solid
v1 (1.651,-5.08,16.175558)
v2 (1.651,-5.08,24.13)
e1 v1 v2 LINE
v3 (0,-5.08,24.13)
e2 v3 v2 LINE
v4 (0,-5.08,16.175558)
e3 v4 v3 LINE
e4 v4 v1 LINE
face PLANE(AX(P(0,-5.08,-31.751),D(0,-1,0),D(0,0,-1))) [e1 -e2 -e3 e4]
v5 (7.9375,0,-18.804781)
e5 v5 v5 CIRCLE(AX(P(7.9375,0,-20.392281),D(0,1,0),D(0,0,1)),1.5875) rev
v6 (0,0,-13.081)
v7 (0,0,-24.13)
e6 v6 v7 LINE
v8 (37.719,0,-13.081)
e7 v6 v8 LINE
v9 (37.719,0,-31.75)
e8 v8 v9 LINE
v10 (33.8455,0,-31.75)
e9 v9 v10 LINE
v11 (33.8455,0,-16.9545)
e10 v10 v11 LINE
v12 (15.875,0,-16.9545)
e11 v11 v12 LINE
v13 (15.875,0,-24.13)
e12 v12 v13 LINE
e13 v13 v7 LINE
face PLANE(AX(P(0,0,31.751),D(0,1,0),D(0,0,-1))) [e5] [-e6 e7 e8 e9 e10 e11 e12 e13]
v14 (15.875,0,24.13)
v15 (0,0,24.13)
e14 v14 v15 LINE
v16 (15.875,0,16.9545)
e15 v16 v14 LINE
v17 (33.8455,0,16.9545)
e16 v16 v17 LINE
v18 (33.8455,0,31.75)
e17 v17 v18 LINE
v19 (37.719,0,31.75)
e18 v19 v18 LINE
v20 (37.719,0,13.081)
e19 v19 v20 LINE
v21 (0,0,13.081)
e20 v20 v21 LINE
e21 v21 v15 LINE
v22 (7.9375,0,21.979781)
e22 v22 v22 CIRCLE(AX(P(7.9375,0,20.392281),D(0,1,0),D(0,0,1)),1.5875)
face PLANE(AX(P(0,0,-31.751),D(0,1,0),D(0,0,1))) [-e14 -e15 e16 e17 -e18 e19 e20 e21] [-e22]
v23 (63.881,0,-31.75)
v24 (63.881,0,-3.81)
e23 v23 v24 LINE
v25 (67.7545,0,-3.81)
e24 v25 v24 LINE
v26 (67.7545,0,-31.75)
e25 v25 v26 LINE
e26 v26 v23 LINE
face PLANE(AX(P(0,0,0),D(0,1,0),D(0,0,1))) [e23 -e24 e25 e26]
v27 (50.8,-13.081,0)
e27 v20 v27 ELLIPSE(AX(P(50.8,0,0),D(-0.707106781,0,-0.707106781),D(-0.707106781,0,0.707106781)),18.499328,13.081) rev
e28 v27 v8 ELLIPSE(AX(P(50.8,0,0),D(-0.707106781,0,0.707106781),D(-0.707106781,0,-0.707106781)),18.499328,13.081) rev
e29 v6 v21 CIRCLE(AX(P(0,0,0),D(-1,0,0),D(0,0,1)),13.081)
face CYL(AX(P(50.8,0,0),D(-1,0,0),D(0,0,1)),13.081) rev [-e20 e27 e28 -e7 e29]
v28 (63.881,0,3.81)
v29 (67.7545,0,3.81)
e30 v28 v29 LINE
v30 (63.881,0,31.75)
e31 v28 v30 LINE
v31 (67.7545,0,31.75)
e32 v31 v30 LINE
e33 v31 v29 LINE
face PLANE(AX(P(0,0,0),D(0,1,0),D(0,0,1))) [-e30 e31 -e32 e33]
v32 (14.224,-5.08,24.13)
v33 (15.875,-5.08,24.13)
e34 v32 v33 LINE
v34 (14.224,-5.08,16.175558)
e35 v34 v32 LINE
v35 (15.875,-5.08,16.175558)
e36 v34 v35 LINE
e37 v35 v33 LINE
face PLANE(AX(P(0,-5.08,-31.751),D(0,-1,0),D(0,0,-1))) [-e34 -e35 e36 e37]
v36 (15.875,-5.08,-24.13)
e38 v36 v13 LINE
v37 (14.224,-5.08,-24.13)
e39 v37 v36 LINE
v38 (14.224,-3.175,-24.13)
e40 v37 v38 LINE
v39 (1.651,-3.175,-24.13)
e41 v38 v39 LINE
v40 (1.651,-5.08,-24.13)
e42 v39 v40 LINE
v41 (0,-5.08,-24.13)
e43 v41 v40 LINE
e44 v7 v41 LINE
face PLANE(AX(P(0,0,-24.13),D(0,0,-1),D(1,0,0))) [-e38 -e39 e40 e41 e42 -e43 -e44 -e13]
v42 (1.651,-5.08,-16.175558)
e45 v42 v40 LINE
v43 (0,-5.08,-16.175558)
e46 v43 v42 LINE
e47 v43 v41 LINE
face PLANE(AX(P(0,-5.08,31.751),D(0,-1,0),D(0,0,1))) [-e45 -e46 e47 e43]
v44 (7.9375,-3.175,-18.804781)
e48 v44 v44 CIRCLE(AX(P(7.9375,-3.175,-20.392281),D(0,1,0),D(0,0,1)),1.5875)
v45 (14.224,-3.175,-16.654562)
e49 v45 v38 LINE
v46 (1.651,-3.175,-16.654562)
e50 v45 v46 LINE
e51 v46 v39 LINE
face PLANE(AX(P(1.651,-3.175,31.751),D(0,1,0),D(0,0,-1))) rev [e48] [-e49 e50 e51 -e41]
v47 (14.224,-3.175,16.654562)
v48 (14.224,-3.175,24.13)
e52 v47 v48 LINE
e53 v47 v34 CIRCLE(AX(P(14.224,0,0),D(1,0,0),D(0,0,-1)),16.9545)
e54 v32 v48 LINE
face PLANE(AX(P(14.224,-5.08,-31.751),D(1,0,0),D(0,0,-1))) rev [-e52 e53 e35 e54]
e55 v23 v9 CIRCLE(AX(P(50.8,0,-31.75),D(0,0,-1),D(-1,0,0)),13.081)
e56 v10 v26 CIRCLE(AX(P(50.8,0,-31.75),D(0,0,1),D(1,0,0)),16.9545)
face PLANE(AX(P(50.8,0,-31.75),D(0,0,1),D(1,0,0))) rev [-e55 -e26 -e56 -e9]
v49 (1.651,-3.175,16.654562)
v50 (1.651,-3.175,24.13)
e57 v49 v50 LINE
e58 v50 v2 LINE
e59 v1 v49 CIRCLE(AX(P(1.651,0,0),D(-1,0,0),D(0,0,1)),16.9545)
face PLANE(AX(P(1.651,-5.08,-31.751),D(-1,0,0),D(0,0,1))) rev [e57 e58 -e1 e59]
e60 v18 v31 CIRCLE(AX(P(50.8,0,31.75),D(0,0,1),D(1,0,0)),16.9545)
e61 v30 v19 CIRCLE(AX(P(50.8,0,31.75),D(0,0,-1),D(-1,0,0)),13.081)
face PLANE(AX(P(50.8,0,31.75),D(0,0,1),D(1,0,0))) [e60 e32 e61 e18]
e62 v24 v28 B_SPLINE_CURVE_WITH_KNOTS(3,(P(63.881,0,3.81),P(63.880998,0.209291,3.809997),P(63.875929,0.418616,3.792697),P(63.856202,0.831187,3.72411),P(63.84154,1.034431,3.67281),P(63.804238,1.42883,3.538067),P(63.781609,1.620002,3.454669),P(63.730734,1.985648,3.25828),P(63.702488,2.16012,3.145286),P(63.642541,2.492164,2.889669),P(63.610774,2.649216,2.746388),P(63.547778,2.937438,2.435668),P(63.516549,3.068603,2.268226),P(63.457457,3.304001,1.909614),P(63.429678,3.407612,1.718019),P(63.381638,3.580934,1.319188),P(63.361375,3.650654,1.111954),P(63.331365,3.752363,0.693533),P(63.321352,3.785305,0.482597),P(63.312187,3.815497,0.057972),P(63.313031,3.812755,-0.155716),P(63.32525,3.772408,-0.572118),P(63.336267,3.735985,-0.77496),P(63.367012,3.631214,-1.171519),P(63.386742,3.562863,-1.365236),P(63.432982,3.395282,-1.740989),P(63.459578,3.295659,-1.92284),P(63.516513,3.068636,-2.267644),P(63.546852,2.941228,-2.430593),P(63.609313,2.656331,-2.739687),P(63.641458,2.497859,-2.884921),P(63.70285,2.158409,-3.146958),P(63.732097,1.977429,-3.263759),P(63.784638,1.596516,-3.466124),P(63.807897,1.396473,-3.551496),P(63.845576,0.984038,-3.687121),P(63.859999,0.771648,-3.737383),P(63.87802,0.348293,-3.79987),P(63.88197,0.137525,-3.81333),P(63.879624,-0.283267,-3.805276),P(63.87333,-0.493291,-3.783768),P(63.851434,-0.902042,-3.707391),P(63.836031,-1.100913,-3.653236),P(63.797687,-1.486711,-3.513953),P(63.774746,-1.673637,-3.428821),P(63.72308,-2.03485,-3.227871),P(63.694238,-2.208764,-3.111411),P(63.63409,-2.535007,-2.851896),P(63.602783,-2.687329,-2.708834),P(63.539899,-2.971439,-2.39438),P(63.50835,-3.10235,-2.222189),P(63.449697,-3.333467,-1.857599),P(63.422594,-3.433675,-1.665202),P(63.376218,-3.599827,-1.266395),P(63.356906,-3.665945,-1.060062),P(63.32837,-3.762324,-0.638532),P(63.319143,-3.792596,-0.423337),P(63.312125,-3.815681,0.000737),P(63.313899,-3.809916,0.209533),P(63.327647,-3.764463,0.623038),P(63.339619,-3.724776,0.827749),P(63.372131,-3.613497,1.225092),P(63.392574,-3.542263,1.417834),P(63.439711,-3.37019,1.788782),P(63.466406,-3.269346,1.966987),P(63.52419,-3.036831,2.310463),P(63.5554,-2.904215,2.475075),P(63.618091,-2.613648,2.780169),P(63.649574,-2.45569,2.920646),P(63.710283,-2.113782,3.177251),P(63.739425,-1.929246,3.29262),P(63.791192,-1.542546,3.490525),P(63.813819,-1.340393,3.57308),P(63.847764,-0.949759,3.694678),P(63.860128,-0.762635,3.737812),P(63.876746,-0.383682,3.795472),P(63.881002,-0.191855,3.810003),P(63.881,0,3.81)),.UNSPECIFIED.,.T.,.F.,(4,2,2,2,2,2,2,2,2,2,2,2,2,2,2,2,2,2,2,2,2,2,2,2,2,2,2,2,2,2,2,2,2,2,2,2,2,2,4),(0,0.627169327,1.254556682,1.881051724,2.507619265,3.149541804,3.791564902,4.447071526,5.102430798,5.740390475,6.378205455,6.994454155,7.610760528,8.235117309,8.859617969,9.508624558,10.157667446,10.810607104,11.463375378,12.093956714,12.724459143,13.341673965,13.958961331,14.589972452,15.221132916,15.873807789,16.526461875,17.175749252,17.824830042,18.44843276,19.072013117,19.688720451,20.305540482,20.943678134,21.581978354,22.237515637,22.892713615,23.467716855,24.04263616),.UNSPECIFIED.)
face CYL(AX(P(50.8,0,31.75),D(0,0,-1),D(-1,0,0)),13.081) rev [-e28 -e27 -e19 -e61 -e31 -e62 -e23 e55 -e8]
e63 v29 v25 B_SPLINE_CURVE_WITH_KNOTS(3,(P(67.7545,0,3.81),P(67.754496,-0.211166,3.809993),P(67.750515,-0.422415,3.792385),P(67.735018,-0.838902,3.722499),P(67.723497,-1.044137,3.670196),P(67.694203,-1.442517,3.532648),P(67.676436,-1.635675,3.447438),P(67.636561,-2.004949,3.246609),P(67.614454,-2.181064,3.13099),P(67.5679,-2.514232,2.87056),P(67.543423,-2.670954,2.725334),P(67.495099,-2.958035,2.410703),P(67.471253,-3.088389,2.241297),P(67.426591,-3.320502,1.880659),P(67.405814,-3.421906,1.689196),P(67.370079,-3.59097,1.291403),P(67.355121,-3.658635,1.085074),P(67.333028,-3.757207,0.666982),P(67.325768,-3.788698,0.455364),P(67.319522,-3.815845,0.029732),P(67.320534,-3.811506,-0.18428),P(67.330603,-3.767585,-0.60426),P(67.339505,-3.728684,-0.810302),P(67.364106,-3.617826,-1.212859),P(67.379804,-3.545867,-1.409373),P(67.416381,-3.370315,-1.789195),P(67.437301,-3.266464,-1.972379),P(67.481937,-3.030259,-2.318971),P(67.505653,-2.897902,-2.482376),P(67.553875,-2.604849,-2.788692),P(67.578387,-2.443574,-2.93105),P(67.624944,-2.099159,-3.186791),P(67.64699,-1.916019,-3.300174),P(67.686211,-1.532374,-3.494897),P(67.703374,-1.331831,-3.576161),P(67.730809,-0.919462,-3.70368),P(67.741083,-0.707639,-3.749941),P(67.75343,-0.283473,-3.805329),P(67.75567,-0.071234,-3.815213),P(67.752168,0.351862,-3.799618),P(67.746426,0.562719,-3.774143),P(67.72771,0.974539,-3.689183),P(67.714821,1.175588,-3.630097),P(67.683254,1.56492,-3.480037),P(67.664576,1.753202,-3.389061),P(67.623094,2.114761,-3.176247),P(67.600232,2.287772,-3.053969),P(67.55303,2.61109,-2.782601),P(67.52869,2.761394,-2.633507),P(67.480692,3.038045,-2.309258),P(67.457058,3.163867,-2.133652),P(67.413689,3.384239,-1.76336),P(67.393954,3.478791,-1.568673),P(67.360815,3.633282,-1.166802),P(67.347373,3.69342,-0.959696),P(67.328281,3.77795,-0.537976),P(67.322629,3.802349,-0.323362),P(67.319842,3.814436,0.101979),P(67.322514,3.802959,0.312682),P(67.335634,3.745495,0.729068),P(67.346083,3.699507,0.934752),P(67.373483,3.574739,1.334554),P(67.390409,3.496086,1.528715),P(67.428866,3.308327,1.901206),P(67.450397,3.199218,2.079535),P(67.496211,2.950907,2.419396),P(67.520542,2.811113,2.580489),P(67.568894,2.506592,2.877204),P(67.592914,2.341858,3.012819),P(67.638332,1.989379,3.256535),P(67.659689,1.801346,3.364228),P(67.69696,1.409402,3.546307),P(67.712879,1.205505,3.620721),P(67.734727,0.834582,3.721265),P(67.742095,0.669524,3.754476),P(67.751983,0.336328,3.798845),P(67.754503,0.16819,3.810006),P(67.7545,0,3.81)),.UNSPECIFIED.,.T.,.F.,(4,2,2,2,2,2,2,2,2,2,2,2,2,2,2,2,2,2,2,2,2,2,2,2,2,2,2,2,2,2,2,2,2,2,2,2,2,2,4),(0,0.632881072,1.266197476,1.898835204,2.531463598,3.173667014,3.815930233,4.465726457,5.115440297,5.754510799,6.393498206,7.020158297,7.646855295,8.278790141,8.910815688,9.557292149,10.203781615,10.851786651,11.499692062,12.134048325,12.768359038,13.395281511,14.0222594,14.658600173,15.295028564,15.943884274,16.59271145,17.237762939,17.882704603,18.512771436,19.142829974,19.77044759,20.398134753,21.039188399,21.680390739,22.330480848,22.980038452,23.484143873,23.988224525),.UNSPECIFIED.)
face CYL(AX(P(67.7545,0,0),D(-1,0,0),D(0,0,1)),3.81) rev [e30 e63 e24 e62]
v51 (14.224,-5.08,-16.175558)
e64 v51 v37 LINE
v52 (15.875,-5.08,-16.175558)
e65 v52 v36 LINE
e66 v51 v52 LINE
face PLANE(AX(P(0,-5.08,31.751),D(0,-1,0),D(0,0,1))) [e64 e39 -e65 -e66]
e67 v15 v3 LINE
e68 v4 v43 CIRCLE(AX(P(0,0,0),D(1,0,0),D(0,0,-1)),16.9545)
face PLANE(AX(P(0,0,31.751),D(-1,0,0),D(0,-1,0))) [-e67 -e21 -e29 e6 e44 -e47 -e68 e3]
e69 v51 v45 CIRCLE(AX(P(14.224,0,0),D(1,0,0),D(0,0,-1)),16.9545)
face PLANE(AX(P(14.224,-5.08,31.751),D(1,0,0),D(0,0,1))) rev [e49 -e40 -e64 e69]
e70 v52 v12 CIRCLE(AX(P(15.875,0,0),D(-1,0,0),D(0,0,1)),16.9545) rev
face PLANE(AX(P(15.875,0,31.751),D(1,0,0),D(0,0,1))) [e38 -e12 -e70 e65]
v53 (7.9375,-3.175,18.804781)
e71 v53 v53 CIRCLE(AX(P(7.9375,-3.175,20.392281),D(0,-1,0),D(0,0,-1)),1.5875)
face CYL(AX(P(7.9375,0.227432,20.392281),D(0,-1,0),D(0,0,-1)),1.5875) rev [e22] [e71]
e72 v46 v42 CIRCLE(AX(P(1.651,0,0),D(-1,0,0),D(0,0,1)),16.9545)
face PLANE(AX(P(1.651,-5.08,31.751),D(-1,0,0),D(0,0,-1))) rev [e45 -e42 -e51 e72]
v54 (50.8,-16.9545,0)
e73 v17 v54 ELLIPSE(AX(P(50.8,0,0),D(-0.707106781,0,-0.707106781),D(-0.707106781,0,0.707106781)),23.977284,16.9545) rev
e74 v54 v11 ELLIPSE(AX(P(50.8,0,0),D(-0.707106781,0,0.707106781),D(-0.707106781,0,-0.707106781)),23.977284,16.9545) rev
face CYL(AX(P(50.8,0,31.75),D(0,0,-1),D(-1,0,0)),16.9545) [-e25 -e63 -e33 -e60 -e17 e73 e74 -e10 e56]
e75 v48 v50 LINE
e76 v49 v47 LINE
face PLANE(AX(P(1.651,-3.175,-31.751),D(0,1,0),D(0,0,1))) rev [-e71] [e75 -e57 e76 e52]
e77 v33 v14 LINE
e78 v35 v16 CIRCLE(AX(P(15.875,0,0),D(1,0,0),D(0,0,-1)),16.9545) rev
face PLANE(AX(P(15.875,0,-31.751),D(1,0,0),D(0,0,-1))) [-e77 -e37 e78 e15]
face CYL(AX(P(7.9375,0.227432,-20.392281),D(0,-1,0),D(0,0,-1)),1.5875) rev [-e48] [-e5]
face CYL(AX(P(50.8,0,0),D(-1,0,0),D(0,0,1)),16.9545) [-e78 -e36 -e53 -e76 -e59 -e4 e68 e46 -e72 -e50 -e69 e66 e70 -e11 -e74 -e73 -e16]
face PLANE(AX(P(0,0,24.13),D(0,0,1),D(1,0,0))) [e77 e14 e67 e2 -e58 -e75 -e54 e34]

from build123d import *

# Parameters (mm, degrees)
SKETCH1_R                = 16.9545
BOSS_EXTRUDE1_DEPTH      = 50.8
SKETCH2_R                = 16.9545
BOSS_EXTRUDE2_DEPTH      = 31.75
SKETCH3_R                = 13.081
CUT_EXTRUDE1_DEPTH       = 50.8
SKETCH5_R                = 13.081
CUT_EXTRUDE2_DEPTH       = 63.5
CUT_EXTRUDE4_DEPTH       = 77.72150833
CUT_EXTRUDE4_DEPTH_BACK  = 77.72150833
SKETCH6_R                = 3.81
BOSS_EXTRUDE3_REACH      = 91.447
BOSS_EXTRUDE3_END_RADIUS = 16.9545
SKETCH8_W                = 15.875
SKETCH8_H                = 5.08
CUT_EXTRUDE5_REACH       = 91.447
CUT_EXTRUDE5_END_RADIUS  = 16.9545
SKETCH9_W                = 12.573
SKETCH9_H                = 1.905
SKETCH10_R               = 1.5875
CUT_EXTRUDE6_DEPTH       = 77.08291144


with BuildPart() as part:
    # Sketch1 → Boss-Extrude1 (new body)
    with BuildSketch(Plane(origin=(0, 0, 0), x_dir=(0, 0, -1), z_dir=(1, 0, 0))):
        Circle(SKETCH1_R)
    extrude(amount=BOSS_EXTRUDE1_DEPTH)

    # Sketch2 → Boss-Extrude2 (add, symmetric)
    with BuildSketch(Plane.XY):
        with Locations((50.8, 0)):
            Circle(SKETCH2_R)
    extrude(amount=BOSS_EXTRUDE2_DEPTH, both=True)

    # Sketch3 → Cut-Extrude1 (cut)
    with BuildSketch(Plane.ZY):
        Circle(SKETCH3_R)
    extrude(amount=-CUT_EXTRUDE1_DEPTH, mode=Mode.SUBTRACT)

    # Sketch5 → Cut-Extrude2 (cut)
    with BuildSketch(Plane(origin=(0, 0, -31.75), x_dir=(-1, 0, 0), z_dir=(0, 0, -1))):
        with Locations((-50.8, 0)):
            Circle(SKETCH5_R)
    extrude(amount=-CUT_EXTRUDE2_DEPTH, mode=Mode.SUBTRACT)

    # Sketch6 → Cut-Extrude4 (cut, two sides: drawn at the far end of the back side and taken through both)
    with BuildSketch(Plane(origin=(0, 0, 0), x_dir=(0, 0, -1), z_dir=(1, 0, 0)).offset(-CUT_EXTRUDE4_DEPTH_BACK)):
        with Locations(Location((0, 0, 0), (0, 0, 180))):
            Circle(SKETCH6_R)
    extrude(amount=CUT_EXTRUDE4_DEPTH + CUT_EXTRUDE4_DEPTH_BACK, mode=Mode.SUBTRACT)

    # SurfaceCut1
    split(bisect_by=Plane(origin=(0, 0, 0), x_dir=(1, 0, 0), z_dir=(0, 1, 0)), keep=Keep.BOTTOM)


with BuildPart() as body_2:
    # Boss-Extrude3: up to this cylinder (the profile starts outside it)
    boss_extrude3_end = Plane(origin=(7.9375, 0, 0), z_dir=(-1, 0, 0)) * Cylinder(BOSS_EXTRUDE3_END_RADIUS, 217.803, mode=Mode.PRIVATE)
    # Sketch8 → Boss-Extrude3 (new, up to the surface)
    with BuildSketch(Plane.XY.offset(24.13), mode=Mode.PRIVATE) as boss_extrude3_sk1:
        with Locations((7.9375, -2.54)):
            Rectangle(SKETCH8_W, SKETCH8_H)
    boss_extrude3_tool1 = extrude(boss_extrude3_sk1.sketch, amount=-BOSS_EXTRUDE3_REACH, mode=Mode.PRIVATE) - boss_extrude3_end
    add(boss_extrude3_tool1.solids().sort_by_distance((7.9375, -2.54, 24.13))[0])

    # Cut-Extrude5: up to this cylinder (the profile starts outside it)
    cut_extrude5_end = Plane(origin=(7.9375, 0, 0), z_dir=(-1, 0, 0)) * Cylinder(CUT_EXTRUDE5_END_RADIUS, 217.803, mode=Mode.PRIVATE)
    # Sketch9 → Cut-Extrude5 (cut, up to the surface)
    with BuildSketch(Plane.XY.offset(24.13), mode=Mode.PRIVATE) as cut_extrude5_sk1:
        with Locations((7.9375, -4.1275)):
            Rectangle(SKETCH9_W, SKETCH9_H)
    cut_extrude5_tool1 = extrude(cut_extrude5_sk1.sketch, amount=-CUT_EXTRUDE5_REACH, mode=Mode.PRIVATE) - cut_extrude5_end
    add(cut_extrude5_tool1.solids().sort_by_distance((7.9375, -4.1275, 24.13))[0], mode=Mode.SUBTRACT)


with BuildPart() as body_3:
    # Mirror1: mirrored copy
    add(body_2.part.mirror(Plane.XY))


with BuildPart() as part_1:
    add(part.part)

    # Intersect1: read off the stored shape, not the designer's step
    # Intersect1: union body 3, body 2
    add(body_3.part)
    add(body_2.part)

    # Sketch10 → Cut-Extrude6 (cut, through all)
    with BuildSketch(Plane.XZ.offset(3.175)):
        with Locations(Location((7.9375, 20.392281148, 0), (0, 0, 270))):
            Circle(SKETCH10_R)
    cut_extrude6 = extrude(amount=-CUT_EXTRUDE6_DEPTH, mode=Mode.SUBTRACT)

    # Mirror2: Cut-Extrude6 across plane
    add(cut_extrude6.mirror(Plane.XY), mode=Mode.SUBTRACT)


solid = part_1.part
